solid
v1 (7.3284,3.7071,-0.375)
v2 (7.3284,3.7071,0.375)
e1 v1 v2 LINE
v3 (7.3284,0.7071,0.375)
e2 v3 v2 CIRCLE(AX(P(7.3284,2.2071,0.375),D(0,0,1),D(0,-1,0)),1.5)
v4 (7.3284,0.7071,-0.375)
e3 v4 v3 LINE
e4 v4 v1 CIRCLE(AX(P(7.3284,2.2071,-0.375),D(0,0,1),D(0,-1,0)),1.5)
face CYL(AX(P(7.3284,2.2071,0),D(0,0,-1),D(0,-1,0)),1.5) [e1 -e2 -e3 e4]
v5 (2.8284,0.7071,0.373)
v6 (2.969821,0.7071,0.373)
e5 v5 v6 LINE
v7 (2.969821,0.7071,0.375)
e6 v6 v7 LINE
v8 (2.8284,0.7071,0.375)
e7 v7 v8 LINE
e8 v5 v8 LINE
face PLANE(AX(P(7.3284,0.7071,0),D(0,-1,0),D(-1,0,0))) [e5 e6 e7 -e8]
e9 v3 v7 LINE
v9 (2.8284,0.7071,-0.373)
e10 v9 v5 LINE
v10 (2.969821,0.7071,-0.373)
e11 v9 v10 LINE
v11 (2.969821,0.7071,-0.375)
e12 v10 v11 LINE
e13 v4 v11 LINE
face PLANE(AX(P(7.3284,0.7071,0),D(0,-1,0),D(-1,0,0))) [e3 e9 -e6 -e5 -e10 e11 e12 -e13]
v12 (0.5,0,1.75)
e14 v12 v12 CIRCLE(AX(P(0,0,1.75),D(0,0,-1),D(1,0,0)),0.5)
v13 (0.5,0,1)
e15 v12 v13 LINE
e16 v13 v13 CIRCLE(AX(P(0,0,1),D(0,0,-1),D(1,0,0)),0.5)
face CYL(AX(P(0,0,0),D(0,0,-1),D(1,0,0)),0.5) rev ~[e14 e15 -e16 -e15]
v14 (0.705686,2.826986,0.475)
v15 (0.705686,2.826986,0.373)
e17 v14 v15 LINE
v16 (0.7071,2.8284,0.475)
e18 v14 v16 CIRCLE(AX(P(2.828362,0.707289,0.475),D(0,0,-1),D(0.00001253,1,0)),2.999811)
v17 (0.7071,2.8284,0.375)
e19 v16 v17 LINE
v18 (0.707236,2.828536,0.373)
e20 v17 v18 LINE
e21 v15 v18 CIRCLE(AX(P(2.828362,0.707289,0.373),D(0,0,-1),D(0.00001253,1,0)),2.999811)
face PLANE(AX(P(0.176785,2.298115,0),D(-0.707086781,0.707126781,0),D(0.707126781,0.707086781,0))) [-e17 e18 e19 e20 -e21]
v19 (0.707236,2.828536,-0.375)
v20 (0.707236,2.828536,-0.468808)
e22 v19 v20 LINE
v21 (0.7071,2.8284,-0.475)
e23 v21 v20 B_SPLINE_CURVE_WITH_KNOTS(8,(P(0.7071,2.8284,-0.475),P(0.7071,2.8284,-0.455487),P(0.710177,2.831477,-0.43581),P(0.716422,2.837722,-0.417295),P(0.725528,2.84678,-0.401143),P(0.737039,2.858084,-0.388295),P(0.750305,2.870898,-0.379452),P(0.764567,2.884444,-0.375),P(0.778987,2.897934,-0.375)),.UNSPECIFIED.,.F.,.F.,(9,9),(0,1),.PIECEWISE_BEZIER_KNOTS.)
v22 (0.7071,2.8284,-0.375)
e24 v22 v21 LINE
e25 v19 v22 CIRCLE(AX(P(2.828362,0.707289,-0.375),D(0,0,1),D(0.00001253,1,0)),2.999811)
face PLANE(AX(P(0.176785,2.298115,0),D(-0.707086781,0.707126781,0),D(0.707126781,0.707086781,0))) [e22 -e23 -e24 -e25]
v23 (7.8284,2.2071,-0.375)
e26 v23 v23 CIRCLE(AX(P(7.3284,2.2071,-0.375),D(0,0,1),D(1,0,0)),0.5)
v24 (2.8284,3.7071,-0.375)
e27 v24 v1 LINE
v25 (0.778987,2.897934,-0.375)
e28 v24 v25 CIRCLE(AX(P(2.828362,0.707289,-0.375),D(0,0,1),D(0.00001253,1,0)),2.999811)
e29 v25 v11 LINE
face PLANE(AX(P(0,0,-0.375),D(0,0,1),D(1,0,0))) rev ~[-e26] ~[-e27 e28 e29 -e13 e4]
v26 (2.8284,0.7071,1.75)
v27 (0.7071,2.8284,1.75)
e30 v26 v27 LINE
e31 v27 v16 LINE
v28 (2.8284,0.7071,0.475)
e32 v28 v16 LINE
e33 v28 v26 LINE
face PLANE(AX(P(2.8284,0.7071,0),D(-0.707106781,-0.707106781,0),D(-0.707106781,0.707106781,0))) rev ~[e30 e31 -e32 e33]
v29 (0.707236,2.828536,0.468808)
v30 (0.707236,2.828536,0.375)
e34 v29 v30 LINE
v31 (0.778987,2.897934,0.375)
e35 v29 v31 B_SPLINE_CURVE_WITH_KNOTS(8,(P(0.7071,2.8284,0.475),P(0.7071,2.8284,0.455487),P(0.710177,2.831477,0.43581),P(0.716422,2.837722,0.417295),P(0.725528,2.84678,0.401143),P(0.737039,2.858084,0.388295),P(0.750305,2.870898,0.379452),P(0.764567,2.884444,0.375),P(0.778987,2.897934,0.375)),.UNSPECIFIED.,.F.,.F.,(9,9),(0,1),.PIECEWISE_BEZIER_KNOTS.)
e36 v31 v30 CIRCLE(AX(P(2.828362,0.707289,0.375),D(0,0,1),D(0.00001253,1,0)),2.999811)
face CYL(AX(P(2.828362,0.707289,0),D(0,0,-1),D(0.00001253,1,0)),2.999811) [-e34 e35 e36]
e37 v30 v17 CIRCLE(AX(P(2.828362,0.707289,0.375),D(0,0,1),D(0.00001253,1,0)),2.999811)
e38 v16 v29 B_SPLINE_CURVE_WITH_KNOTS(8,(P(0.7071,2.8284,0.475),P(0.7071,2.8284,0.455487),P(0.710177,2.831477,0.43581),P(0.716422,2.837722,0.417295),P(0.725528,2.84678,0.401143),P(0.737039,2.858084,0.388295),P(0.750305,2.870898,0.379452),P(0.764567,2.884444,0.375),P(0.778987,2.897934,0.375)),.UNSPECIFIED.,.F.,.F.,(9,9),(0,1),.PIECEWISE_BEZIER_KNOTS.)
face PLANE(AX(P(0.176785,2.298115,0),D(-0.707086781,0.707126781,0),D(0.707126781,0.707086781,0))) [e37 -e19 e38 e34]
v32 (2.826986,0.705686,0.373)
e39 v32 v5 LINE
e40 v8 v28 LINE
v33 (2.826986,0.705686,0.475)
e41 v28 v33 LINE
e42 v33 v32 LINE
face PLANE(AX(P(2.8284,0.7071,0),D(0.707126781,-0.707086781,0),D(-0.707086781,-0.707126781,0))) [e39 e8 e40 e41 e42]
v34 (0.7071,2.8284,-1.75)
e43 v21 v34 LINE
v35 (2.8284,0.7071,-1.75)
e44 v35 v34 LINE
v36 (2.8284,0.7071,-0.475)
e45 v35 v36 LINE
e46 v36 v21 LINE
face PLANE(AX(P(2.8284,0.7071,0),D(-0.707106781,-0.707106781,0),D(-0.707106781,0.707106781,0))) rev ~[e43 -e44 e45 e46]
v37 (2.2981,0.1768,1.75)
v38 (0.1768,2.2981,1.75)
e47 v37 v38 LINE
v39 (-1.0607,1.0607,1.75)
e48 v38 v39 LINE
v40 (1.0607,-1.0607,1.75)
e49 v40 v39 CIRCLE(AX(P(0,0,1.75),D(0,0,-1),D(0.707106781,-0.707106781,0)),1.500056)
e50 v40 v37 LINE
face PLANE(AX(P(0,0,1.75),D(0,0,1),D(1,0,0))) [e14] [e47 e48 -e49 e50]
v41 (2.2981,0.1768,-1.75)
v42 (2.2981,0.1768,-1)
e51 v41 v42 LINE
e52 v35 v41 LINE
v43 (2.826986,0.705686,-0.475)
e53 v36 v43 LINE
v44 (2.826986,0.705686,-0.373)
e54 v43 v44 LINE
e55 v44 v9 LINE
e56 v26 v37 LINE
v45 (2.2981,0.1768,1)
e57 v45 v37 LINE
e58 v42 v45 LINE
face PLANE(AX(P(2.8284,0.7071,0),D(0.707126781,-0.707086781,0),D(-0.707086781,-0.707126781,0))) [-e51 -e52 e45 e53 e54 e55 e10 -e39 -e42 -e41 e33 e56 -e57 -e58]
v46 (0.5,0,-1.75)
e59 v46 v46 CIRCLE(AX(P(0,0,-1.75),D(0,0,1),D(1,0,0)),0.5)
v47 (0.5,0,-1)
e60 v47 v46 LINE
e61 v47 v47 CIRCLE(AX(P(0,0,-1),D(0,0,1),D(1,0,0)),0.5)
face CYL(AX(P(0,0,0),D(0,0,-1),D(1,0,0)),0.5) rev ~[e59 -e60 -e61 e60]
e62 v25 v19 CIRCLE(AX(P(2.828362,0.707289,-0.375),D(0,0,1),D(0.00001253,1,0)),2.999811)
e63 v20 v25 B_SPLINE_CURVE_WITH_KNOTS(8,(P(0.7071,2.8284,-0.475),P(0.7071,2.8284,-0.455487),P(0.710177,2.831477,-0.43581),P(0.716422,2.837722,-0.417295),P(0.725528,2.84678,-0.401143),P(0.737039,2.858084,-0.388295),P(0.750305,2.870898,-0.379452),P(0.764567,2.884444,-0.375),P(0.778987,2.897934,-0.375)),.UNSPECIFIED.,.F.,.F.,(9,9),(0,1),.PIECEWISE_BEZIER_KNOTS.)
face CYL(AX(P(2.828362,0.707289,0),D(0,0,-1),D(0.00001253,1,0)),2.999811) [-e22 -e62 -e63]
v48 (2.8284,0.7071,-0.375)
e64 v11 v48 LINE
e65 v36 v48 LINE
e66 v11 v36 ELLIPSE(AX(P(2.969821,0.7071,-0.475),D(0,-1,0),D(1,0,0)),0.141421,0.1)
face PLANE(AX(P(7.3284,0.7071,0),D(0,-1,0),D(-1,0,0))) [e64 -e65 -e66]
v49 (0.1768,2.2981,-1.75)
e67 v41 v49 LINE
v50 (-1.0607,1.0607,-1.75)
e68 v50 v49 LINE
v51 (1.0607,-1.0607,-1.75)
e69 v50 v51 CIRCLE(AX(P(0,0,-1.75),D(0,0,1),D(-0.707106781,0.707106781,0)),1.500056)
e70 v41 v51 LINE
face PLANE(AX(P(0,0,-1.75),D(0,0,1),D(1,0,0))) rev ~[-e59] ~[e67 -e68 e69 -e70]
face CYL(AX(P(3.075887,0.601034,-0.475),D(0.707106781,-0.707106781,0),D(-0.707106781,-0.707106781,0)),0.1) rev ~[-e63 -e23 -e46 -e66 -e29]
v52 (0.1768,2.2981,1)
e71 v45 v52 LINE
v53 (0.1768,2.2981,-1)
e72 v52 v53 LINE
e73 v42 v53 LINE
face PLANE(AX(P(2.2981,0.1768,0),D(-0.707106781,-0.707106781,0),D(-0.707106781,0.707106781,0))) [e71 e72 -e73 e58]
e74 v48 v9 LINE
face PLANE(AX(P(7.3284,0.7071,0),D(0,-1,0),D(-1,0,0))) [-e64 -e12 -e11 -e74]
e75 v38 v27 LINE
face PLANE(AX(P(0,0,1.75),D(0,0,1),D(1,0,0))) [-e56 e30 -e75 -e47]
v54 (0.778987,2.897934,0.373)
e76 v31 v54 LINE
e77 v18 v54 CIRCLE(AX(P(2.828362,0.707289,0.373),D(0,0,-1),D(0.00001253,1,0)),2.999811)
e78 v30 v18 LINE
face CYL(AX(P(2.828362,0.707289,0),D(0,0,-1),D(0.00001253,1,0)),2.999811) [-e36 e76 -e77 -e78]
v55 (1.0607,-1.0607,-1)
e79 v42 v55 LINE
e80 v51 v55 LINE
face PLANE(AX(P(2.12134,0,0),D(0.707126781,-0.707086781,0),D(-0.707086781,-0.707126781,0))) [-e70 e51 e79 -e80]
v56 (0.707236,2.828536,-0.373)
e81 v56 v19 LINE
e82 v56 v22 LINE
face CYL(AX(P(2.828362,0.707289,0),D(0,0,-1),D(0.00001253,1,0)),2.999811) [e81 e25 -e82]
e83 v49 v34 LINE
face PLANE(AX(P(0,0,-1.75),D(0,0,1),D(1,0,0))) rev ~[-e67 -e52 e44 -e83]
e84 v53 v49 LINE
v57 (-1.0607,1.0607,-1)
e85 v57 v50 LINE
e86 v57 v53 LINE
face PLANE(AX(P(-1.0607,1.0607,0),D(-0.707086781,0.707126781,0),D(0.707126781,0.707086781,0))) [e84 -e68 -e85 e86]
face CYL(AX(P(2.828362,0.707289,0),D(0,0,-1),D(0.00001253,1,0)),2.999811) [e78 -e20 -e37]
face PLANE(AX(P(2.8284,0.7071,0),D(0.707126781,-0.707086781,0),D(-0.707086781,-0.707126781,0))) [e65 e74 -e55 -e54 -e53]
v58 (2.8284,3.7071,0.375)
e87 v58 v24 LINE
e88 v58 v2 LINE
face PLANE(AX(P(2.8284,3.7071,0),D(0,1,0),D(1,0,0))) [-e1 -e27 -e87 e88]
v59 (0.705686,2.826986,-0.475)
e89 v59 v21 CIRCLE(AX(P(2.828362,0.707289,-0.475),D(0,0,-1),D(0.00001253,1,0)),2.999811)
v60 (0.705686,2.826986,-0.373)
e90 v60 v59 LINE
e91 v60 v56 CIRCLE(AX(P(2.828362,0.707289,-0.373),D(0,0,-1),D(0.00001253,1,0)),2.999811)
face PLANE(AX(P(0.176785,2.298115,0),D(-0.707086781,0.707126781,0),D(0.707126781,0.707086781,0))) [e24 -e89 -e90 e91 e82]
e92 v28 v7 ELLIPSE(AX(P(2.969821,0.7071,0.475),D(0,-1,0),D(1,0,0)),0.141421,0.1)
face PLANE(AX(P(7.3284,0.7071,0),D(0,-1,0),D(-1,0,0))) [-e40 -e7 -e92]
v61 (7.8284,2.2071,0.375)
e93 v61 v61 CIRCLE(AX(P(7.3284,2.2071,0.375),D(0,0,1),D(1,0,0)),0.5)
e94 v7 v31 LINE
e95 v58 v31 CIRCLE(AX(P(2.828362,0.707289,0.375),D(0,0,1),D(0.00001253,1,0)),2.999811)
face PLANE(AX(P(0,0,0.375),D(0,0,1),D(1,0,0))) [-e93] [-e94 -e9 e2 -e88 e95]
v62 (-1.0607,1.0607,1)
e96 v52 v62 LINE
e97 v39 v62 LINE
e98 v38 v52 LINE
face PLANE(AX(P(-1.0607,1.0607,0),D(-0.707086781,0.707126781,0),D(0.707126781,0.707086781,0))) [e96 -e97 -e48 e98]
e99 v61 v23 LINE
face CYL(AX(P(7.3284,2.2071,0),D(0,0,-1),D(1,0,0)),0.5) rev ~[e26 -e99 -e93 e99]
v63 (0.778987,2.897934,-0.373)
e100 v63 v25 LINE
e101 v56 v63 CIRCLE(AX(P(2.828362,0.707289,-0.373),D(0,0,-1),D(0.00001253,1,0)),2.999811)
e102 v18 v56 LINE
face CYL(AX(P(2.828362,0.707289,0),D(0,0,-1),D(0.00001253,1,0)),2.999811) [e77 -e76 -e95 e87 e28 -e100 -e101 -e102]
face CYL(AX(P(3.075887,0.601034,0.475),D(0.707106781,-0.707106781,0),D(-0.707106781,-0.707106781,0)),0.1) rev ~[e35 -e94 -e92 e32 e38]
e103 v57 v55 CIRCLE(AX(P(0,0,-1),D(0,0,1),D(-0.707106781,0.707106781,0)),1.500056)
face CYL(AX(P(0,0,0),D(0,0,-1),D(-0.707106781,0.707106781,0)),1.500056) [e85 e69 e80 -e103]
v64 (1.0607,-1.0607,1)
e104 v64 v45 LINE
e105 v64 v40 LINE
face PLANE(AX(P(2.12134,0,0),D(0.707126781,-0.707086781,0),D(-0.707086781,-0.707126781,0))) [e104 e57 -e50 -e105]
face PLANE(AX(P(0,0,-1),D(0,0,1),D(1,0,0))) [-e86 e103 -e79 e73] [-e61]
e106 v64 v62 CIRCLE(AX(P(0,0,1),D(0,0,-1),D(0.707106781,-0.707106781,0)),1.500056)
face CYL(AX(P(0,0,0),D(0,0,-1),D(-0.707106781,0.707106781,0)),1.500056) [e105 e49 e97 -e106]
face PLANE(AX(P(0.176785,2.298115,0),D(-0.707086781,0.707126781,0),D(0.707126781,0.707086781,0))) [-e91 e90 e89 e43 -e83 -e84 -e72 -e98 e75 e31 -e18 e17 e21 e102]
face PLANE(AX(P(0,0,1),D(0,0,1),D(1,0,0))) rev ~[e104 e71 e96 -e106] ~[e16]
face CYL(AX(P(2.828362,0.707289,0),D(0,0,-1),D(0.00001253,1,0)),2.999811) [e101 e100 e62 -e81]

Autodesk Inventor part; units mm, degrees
ref_plane "YZ Plane" through (0, 0, 0) normal (1, 0, 0) x (0, 1, 0)
ref_plane "XZ Plane" through (0, 0, 0) normal (0, 1, 0) x (-1, 0, 0)
ref_plane "XY Plane" through (0, 0, 0) normal (0, 0, 1) x (1, 0, 0)
sketch "Sketch1" plane through (0, 0, 0) normal (0, 0, 1) x (1, 0, 0)
  line L0 (0, -3.3292) -> (0, 5.126) projected
  line L1 (-4.3113, 0) -> (11.0184, 0) projected
  line L2 (-1.0607, 1.0607) -> (0.7071, 2.8284)
  arc A0 (2.8284, 3.7071) -> (0.7071, 2.8284) centre (2.8284, 0.7071) ccw
  line L3 (2.8284, 3.7071) -> (7.3284, 3.7071)
  arc A1 (7.3284, 0.7071) -> (7.3284, 3.7071) centre (7.3284, 2.2071) ccw
  line L4 (7.3284, 0.7071) -> (2.8284, 0.7071)
  line L5 (2.8284, 0.7071) -> (1.0607, -1.0607)
  arc A2 (-1.0607, 1.0607) -> (1.0607, -1.0607) centre (0, 0) ccw
  circle A3 centre (0, 0) radius 0.5
  circle A4 centre (7.3284, 2.2071) radius 0.5
  line L6 (2.8284, 0.7071) -> (0.7071, 2.8284)
  line L7 (2.2981, 0.1768) -> (0.1768, 2.2981)
  line L8 (2.2981, 0.1768) -> (2.2981, 0.1768)
  dimension "d0" = 4.5
  dimension "d1" = 45
  dimension "d2" = 1
  dimension "d3" = 1
  dimension "d5" = 2.5
  dimension "d6" = 1.5
  dimension "d8" = 2.5
  dimension "d9" = 1.5
extrude "Extrusion1" add sketch "Sketch1" along normal mid plane 0.75 contours L6 A0 L3 A1 L4
extrude "Extrusion2" add sketch "Sketch1" along normal mid plane 3.5 contours L7 L2 L6 L5
extrude "Extrusion3" add sketch "Sketch1" along normal mid plane 3.5 contours A2 L1 A3 L0 | L0 A3 L1 L5 A2 | A2 L2 L0 A3 L1 | A3 L0 L2 L7 L5 L1
extrude "Extrusion4" cut sketch "Sketch1" along normal mid plane 2 contours A2 L1 A3 L0 | L0 A3 L1 L5 A2 | A2 L2 L0 A3 L1 | A3 L0 L2 L7 L5 L1
fillet "Fillet1" radius 0.1 2 edges at (1.7678, 1.7678, 0.375) (1.7678, 1.7678, -0.375)
properties part number "7c"
